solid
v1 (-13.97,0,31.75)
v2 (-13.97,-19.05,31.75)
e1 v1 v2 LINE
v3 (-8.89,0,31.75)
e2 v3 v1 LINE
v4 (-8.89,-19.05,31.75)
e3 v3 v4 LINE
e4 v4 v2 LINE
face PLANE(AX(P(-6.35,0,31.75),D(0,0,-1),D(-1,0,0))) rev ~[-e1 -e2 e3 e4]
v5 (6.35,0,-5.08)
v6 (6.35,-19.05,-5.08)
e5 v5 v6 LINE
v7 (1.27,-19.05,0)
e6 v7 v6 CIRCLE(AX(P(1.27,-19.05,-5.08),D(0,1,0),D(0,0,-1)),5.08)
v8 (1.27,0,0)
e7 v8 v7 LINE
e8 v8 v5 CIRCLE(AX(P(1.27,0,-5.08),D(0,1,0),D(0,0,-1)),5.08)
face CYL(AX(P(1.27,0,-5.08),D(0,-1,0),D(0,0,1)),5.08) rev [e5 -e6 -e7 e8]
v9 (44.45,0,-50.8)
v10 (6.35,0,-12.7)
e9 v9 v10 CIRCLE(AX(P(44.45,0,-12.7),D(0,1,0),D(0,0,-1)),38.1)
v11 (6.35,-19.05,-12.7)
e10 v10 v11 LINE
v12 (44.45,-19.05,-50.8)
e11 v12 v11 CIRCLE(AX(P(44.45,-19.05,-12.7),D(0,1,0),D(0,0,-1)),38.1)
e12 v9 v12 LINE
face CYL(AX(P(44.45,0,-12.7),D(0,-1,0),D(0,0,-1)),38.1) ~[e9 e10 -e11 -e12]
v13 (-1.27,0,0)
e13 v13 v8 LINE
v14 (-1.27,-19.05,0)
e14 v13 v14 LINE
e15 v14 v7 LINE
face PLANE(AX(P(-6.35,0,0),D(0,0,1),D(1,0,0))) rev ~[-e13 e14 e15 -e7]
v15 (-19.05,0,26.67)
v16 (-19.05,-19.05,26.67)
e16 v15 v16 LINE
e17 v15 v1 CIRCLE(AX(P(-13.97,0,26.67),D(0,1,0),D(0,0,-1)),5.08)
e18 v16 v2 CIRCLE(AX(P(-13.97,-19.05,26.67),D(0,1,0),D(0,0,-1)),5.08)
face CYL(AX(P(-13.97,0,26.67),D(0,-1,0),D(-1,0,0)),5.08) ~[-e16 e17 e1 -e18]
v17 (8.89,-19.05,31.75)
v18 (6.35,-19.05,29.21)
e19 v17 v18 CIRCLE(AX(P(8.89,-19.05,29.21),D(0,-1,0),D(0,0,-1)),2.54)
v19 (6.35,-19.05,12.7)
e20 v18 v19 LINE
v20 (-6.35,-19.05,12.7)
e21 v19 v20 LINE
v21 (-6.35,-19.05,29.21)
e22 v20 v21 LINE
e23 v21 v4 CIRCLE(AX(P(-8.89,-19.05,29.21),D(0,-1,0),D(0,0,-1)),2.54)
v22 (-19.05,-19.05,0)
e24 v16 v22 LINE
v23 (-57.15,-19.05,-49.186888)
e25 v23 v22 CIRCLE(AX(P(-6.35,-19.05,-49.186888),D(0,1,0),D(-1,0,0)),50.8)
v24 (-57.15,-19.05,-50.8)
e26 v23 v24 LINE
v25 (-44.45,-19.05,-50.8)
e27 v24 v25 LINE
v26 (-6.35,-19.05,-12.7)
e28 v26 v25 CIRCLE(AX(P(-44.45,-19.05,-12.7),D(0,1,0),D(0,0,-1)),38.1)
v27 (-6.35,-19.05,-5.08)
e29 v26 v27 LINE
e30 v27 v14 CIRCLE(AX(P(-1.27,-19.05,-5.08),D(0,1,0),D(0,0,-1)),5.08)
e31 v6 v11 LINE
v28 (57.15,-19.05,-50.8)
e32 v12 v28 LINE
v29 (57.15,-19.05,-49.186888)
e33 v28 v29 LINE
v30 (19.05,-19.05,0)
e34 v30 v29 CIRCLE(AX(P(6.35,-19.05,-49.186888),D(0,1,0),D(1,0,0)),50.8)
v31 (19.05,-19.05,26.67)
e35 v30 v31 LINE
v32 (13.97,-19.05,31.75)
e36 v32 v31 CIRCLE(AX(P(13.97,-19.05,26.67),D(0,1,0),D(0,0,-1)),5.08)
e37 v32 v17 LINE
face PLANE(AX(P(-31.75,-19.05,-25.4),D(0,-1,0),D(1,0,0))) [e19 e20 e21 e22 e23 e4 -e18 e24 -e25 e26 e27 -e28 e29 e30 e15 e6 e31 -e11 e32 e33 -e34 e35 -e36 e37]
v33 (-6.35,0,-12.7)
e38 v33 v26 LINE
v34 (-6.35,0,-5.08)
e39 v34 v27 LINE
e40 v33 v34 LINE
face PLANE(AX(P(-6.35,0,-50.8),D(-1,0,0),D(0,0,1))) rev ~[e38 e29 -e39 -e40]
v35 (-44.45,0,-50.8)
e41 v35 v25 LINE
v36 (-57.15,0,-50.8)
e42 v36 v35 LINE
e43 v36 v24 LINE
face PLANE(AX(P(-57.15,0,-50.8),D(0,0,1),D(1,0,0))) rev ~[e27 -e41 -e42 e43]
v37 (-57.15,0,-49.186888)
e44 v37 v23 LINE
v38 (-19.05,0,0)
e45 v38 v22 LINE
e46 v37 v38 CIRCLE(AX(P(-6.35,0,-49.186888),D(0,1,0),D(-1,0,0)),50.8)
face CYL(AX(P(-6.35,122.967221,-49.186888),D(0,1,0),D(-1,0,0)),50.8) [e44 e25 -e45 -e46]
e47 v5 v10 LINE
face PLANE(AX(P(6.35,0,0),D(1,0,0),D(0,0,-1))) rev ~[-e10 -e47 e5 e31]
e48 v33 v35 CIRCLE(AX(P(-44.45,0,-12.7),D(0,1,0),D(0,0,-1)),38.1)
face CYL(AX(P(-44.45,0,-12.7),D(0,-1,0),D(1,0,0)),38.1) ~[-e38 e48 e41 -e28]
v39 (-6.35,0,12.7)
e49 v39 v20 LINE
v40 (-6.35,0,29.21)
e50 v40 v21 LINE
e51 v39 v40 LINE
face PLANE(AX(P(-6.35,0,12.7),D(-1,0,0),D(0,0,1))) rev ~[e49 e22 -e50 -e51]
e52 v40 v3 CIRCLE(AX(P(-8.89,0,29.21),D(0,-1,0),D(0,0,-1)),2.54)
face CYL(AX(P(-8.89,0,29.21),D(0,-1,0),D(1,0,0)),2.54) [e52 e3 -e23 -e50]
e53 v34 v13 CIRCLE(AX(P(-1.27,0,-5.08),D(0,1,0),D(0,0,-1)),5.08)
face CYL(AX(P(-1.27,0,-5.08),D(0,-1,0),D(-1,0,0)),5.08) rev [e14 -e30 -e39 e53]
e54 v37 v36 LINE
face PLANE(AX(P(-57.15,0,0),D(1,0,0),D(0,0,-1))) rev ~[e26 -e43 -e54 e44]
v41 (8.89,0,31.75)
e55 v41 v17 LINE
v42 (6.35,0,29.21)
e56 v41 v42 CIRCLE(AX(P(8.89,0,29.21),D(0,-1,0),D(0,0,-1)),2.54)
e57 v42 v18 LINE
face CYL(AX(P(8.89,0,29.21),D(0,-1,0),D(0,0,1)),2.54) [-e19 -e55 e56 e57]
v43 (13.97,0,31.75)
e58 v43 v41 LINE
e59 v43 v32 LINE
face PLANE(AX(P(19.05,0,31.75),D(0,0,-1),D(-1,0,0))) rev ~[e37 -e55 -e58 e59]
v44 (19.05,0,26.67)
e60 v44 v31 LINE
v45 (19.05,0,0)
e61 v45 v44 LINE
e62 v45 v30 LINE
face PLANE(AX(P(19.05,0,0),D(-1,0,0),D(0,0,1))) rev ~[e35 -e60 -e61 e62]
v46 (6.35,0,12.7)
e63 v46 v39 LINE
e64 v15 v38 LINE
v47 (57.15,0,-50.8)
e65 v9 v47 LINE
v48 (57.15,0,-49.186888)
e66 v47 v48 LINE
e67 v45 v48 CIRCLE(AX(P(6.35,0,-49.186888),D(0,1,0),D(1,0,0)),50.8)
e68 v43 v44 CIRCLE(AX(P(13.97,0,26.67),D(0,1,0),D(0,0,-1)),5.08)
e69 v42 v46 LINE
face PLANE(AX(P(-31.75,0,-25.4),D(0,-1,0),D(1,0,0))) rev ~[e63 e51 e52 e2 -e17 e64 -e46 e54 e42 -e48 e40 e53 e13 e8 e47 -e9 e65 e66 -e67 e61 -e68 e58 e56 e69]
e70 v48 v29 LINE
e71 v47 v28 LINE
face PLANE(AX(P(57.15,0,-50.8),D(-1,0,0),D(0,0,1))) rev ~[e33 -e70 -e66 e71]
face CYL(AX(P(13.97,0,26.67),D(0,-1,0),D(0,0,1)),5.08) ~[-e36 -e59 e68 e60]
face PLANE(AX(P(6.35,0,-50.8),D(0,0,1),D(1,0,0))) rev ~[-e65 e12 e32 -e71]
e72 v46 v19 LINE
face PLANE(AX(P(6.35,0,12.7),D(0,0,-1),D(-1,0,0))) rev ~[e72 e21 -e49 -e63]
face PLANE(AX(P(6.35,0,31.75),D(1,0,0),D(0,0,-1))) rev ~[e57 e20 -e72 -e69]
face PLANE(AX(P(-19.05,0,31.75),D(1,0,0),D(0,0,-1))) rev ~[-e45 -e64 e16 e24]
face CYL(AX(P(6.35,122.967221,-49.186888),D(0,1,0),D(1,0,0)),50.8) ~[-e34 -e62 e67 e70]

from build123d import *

# Parameters (mm, degrees)
F0_W        = 6.35
F0_H        = 12.7
F1_DEPTH    = 19.05
F2_R        = 2.54
F3_R        = 38.1
F4_T1_DEPTH = 264.9844424842
F5_R        = 5.08
F6_R        = 5.08


# Not quite as in the source:
# - a fillet or chamfer that OpenCascade refuses, or shapes differently, is made with other operations: its cross-section is extruded or revolved along the edge and cut away or added


with BuildPart() as f1:
    # F0 (on Front) → F1 (new body)
    with BuildSketch(Plane.XZ):
        Polygon((-6.35, -50.8), (-6.35, 0), (-19.05, 0), (-57.15, 0), (-57.15, -50.8), align=None)
        Polygon((-19.05, 0), (-6.35, 0), (-6.35, 12.7), (-6.35, 31.75), (-19.05, 31.75), align=None)
        with Locations((-3.175, 6.35)):
            Rectangle(F0_W, F0_H)
        with Locations((3.175, 6.35)):
            Rectangle(F0_W, F0_H)
        Polygon((6.35, 12.7), (6.35, 0), (19.05, 0), (19.05, 31.75), (6.35, 31.75), align=None)
        Polygon((19.05, 0), (6.35, 0), (6.35, -50.8), (57.15, -50.8), (57.15, 0), align=None)
    extrude(amount=F1_DEPTH)

    # F2
    f2_edges = [f1.edges().sort_by_distance(p)[0] for p in [
        (6.35, -9.525, 31.75),
        (-6.35, -9.525, 31.75),
    ]]
    fillet(f2_edges, radius=F2_R)

    # F3
    f3_edges = [f1.edges().sort_by_distance(p)[0] for p in [
        (6.35, -9.525, -50.8),
        (-6.35, -9.525, -50.8),
    ]]
    fillet(f3_edges, radius=F3_R)

    # F4: fillet of radius 50.8 on 2 edges, made by hand

    # F4_s2 → F4_t1 (cut)
    with BuildSketch(Plane.XZ.offset(-122.9672212421)):
        with BuildLine():
            ThreePointArc((-57.15, -49.1868884968), (-46.5109262841, -18.0783687635), (-19.05, 0))
            Line((-19.05, 0), (-57.15, 0))
            Line((-57.15, 0), (-57.15, -49.1868884968))
        make_face()
        with BuildLine():
            ThreePointArc((57.15, -49.1868884968), (46.5109262841, -18.0783687635), (19.05, 0))
            Line((19.05, 0), (57.15, 0))
            Line((57.15, 0), (57.15, -49.1868884968))
        make_face()
    extrude(amount=F4_T1_DEPTH, mode=Mode.SUBTRACT)

    # F5
    f5_edges = [f1.edges().sort_by_distance(p)[0] for p in [
        (-19.05, -9.525, 31.75),
        (19.05, -9.525, 31.75),
    ]]
    fillet(f5_edges, radius=F5_R)

    # F6
    f6_edges = [f1.edges().sort_by_distance(p)[0] for p in [
        (6.35, -9.525, 0),
        (-6.35, -9.525, 0),
    ]]
    fillet(f6_edges, radius=F6_R)


solid = f1.part
